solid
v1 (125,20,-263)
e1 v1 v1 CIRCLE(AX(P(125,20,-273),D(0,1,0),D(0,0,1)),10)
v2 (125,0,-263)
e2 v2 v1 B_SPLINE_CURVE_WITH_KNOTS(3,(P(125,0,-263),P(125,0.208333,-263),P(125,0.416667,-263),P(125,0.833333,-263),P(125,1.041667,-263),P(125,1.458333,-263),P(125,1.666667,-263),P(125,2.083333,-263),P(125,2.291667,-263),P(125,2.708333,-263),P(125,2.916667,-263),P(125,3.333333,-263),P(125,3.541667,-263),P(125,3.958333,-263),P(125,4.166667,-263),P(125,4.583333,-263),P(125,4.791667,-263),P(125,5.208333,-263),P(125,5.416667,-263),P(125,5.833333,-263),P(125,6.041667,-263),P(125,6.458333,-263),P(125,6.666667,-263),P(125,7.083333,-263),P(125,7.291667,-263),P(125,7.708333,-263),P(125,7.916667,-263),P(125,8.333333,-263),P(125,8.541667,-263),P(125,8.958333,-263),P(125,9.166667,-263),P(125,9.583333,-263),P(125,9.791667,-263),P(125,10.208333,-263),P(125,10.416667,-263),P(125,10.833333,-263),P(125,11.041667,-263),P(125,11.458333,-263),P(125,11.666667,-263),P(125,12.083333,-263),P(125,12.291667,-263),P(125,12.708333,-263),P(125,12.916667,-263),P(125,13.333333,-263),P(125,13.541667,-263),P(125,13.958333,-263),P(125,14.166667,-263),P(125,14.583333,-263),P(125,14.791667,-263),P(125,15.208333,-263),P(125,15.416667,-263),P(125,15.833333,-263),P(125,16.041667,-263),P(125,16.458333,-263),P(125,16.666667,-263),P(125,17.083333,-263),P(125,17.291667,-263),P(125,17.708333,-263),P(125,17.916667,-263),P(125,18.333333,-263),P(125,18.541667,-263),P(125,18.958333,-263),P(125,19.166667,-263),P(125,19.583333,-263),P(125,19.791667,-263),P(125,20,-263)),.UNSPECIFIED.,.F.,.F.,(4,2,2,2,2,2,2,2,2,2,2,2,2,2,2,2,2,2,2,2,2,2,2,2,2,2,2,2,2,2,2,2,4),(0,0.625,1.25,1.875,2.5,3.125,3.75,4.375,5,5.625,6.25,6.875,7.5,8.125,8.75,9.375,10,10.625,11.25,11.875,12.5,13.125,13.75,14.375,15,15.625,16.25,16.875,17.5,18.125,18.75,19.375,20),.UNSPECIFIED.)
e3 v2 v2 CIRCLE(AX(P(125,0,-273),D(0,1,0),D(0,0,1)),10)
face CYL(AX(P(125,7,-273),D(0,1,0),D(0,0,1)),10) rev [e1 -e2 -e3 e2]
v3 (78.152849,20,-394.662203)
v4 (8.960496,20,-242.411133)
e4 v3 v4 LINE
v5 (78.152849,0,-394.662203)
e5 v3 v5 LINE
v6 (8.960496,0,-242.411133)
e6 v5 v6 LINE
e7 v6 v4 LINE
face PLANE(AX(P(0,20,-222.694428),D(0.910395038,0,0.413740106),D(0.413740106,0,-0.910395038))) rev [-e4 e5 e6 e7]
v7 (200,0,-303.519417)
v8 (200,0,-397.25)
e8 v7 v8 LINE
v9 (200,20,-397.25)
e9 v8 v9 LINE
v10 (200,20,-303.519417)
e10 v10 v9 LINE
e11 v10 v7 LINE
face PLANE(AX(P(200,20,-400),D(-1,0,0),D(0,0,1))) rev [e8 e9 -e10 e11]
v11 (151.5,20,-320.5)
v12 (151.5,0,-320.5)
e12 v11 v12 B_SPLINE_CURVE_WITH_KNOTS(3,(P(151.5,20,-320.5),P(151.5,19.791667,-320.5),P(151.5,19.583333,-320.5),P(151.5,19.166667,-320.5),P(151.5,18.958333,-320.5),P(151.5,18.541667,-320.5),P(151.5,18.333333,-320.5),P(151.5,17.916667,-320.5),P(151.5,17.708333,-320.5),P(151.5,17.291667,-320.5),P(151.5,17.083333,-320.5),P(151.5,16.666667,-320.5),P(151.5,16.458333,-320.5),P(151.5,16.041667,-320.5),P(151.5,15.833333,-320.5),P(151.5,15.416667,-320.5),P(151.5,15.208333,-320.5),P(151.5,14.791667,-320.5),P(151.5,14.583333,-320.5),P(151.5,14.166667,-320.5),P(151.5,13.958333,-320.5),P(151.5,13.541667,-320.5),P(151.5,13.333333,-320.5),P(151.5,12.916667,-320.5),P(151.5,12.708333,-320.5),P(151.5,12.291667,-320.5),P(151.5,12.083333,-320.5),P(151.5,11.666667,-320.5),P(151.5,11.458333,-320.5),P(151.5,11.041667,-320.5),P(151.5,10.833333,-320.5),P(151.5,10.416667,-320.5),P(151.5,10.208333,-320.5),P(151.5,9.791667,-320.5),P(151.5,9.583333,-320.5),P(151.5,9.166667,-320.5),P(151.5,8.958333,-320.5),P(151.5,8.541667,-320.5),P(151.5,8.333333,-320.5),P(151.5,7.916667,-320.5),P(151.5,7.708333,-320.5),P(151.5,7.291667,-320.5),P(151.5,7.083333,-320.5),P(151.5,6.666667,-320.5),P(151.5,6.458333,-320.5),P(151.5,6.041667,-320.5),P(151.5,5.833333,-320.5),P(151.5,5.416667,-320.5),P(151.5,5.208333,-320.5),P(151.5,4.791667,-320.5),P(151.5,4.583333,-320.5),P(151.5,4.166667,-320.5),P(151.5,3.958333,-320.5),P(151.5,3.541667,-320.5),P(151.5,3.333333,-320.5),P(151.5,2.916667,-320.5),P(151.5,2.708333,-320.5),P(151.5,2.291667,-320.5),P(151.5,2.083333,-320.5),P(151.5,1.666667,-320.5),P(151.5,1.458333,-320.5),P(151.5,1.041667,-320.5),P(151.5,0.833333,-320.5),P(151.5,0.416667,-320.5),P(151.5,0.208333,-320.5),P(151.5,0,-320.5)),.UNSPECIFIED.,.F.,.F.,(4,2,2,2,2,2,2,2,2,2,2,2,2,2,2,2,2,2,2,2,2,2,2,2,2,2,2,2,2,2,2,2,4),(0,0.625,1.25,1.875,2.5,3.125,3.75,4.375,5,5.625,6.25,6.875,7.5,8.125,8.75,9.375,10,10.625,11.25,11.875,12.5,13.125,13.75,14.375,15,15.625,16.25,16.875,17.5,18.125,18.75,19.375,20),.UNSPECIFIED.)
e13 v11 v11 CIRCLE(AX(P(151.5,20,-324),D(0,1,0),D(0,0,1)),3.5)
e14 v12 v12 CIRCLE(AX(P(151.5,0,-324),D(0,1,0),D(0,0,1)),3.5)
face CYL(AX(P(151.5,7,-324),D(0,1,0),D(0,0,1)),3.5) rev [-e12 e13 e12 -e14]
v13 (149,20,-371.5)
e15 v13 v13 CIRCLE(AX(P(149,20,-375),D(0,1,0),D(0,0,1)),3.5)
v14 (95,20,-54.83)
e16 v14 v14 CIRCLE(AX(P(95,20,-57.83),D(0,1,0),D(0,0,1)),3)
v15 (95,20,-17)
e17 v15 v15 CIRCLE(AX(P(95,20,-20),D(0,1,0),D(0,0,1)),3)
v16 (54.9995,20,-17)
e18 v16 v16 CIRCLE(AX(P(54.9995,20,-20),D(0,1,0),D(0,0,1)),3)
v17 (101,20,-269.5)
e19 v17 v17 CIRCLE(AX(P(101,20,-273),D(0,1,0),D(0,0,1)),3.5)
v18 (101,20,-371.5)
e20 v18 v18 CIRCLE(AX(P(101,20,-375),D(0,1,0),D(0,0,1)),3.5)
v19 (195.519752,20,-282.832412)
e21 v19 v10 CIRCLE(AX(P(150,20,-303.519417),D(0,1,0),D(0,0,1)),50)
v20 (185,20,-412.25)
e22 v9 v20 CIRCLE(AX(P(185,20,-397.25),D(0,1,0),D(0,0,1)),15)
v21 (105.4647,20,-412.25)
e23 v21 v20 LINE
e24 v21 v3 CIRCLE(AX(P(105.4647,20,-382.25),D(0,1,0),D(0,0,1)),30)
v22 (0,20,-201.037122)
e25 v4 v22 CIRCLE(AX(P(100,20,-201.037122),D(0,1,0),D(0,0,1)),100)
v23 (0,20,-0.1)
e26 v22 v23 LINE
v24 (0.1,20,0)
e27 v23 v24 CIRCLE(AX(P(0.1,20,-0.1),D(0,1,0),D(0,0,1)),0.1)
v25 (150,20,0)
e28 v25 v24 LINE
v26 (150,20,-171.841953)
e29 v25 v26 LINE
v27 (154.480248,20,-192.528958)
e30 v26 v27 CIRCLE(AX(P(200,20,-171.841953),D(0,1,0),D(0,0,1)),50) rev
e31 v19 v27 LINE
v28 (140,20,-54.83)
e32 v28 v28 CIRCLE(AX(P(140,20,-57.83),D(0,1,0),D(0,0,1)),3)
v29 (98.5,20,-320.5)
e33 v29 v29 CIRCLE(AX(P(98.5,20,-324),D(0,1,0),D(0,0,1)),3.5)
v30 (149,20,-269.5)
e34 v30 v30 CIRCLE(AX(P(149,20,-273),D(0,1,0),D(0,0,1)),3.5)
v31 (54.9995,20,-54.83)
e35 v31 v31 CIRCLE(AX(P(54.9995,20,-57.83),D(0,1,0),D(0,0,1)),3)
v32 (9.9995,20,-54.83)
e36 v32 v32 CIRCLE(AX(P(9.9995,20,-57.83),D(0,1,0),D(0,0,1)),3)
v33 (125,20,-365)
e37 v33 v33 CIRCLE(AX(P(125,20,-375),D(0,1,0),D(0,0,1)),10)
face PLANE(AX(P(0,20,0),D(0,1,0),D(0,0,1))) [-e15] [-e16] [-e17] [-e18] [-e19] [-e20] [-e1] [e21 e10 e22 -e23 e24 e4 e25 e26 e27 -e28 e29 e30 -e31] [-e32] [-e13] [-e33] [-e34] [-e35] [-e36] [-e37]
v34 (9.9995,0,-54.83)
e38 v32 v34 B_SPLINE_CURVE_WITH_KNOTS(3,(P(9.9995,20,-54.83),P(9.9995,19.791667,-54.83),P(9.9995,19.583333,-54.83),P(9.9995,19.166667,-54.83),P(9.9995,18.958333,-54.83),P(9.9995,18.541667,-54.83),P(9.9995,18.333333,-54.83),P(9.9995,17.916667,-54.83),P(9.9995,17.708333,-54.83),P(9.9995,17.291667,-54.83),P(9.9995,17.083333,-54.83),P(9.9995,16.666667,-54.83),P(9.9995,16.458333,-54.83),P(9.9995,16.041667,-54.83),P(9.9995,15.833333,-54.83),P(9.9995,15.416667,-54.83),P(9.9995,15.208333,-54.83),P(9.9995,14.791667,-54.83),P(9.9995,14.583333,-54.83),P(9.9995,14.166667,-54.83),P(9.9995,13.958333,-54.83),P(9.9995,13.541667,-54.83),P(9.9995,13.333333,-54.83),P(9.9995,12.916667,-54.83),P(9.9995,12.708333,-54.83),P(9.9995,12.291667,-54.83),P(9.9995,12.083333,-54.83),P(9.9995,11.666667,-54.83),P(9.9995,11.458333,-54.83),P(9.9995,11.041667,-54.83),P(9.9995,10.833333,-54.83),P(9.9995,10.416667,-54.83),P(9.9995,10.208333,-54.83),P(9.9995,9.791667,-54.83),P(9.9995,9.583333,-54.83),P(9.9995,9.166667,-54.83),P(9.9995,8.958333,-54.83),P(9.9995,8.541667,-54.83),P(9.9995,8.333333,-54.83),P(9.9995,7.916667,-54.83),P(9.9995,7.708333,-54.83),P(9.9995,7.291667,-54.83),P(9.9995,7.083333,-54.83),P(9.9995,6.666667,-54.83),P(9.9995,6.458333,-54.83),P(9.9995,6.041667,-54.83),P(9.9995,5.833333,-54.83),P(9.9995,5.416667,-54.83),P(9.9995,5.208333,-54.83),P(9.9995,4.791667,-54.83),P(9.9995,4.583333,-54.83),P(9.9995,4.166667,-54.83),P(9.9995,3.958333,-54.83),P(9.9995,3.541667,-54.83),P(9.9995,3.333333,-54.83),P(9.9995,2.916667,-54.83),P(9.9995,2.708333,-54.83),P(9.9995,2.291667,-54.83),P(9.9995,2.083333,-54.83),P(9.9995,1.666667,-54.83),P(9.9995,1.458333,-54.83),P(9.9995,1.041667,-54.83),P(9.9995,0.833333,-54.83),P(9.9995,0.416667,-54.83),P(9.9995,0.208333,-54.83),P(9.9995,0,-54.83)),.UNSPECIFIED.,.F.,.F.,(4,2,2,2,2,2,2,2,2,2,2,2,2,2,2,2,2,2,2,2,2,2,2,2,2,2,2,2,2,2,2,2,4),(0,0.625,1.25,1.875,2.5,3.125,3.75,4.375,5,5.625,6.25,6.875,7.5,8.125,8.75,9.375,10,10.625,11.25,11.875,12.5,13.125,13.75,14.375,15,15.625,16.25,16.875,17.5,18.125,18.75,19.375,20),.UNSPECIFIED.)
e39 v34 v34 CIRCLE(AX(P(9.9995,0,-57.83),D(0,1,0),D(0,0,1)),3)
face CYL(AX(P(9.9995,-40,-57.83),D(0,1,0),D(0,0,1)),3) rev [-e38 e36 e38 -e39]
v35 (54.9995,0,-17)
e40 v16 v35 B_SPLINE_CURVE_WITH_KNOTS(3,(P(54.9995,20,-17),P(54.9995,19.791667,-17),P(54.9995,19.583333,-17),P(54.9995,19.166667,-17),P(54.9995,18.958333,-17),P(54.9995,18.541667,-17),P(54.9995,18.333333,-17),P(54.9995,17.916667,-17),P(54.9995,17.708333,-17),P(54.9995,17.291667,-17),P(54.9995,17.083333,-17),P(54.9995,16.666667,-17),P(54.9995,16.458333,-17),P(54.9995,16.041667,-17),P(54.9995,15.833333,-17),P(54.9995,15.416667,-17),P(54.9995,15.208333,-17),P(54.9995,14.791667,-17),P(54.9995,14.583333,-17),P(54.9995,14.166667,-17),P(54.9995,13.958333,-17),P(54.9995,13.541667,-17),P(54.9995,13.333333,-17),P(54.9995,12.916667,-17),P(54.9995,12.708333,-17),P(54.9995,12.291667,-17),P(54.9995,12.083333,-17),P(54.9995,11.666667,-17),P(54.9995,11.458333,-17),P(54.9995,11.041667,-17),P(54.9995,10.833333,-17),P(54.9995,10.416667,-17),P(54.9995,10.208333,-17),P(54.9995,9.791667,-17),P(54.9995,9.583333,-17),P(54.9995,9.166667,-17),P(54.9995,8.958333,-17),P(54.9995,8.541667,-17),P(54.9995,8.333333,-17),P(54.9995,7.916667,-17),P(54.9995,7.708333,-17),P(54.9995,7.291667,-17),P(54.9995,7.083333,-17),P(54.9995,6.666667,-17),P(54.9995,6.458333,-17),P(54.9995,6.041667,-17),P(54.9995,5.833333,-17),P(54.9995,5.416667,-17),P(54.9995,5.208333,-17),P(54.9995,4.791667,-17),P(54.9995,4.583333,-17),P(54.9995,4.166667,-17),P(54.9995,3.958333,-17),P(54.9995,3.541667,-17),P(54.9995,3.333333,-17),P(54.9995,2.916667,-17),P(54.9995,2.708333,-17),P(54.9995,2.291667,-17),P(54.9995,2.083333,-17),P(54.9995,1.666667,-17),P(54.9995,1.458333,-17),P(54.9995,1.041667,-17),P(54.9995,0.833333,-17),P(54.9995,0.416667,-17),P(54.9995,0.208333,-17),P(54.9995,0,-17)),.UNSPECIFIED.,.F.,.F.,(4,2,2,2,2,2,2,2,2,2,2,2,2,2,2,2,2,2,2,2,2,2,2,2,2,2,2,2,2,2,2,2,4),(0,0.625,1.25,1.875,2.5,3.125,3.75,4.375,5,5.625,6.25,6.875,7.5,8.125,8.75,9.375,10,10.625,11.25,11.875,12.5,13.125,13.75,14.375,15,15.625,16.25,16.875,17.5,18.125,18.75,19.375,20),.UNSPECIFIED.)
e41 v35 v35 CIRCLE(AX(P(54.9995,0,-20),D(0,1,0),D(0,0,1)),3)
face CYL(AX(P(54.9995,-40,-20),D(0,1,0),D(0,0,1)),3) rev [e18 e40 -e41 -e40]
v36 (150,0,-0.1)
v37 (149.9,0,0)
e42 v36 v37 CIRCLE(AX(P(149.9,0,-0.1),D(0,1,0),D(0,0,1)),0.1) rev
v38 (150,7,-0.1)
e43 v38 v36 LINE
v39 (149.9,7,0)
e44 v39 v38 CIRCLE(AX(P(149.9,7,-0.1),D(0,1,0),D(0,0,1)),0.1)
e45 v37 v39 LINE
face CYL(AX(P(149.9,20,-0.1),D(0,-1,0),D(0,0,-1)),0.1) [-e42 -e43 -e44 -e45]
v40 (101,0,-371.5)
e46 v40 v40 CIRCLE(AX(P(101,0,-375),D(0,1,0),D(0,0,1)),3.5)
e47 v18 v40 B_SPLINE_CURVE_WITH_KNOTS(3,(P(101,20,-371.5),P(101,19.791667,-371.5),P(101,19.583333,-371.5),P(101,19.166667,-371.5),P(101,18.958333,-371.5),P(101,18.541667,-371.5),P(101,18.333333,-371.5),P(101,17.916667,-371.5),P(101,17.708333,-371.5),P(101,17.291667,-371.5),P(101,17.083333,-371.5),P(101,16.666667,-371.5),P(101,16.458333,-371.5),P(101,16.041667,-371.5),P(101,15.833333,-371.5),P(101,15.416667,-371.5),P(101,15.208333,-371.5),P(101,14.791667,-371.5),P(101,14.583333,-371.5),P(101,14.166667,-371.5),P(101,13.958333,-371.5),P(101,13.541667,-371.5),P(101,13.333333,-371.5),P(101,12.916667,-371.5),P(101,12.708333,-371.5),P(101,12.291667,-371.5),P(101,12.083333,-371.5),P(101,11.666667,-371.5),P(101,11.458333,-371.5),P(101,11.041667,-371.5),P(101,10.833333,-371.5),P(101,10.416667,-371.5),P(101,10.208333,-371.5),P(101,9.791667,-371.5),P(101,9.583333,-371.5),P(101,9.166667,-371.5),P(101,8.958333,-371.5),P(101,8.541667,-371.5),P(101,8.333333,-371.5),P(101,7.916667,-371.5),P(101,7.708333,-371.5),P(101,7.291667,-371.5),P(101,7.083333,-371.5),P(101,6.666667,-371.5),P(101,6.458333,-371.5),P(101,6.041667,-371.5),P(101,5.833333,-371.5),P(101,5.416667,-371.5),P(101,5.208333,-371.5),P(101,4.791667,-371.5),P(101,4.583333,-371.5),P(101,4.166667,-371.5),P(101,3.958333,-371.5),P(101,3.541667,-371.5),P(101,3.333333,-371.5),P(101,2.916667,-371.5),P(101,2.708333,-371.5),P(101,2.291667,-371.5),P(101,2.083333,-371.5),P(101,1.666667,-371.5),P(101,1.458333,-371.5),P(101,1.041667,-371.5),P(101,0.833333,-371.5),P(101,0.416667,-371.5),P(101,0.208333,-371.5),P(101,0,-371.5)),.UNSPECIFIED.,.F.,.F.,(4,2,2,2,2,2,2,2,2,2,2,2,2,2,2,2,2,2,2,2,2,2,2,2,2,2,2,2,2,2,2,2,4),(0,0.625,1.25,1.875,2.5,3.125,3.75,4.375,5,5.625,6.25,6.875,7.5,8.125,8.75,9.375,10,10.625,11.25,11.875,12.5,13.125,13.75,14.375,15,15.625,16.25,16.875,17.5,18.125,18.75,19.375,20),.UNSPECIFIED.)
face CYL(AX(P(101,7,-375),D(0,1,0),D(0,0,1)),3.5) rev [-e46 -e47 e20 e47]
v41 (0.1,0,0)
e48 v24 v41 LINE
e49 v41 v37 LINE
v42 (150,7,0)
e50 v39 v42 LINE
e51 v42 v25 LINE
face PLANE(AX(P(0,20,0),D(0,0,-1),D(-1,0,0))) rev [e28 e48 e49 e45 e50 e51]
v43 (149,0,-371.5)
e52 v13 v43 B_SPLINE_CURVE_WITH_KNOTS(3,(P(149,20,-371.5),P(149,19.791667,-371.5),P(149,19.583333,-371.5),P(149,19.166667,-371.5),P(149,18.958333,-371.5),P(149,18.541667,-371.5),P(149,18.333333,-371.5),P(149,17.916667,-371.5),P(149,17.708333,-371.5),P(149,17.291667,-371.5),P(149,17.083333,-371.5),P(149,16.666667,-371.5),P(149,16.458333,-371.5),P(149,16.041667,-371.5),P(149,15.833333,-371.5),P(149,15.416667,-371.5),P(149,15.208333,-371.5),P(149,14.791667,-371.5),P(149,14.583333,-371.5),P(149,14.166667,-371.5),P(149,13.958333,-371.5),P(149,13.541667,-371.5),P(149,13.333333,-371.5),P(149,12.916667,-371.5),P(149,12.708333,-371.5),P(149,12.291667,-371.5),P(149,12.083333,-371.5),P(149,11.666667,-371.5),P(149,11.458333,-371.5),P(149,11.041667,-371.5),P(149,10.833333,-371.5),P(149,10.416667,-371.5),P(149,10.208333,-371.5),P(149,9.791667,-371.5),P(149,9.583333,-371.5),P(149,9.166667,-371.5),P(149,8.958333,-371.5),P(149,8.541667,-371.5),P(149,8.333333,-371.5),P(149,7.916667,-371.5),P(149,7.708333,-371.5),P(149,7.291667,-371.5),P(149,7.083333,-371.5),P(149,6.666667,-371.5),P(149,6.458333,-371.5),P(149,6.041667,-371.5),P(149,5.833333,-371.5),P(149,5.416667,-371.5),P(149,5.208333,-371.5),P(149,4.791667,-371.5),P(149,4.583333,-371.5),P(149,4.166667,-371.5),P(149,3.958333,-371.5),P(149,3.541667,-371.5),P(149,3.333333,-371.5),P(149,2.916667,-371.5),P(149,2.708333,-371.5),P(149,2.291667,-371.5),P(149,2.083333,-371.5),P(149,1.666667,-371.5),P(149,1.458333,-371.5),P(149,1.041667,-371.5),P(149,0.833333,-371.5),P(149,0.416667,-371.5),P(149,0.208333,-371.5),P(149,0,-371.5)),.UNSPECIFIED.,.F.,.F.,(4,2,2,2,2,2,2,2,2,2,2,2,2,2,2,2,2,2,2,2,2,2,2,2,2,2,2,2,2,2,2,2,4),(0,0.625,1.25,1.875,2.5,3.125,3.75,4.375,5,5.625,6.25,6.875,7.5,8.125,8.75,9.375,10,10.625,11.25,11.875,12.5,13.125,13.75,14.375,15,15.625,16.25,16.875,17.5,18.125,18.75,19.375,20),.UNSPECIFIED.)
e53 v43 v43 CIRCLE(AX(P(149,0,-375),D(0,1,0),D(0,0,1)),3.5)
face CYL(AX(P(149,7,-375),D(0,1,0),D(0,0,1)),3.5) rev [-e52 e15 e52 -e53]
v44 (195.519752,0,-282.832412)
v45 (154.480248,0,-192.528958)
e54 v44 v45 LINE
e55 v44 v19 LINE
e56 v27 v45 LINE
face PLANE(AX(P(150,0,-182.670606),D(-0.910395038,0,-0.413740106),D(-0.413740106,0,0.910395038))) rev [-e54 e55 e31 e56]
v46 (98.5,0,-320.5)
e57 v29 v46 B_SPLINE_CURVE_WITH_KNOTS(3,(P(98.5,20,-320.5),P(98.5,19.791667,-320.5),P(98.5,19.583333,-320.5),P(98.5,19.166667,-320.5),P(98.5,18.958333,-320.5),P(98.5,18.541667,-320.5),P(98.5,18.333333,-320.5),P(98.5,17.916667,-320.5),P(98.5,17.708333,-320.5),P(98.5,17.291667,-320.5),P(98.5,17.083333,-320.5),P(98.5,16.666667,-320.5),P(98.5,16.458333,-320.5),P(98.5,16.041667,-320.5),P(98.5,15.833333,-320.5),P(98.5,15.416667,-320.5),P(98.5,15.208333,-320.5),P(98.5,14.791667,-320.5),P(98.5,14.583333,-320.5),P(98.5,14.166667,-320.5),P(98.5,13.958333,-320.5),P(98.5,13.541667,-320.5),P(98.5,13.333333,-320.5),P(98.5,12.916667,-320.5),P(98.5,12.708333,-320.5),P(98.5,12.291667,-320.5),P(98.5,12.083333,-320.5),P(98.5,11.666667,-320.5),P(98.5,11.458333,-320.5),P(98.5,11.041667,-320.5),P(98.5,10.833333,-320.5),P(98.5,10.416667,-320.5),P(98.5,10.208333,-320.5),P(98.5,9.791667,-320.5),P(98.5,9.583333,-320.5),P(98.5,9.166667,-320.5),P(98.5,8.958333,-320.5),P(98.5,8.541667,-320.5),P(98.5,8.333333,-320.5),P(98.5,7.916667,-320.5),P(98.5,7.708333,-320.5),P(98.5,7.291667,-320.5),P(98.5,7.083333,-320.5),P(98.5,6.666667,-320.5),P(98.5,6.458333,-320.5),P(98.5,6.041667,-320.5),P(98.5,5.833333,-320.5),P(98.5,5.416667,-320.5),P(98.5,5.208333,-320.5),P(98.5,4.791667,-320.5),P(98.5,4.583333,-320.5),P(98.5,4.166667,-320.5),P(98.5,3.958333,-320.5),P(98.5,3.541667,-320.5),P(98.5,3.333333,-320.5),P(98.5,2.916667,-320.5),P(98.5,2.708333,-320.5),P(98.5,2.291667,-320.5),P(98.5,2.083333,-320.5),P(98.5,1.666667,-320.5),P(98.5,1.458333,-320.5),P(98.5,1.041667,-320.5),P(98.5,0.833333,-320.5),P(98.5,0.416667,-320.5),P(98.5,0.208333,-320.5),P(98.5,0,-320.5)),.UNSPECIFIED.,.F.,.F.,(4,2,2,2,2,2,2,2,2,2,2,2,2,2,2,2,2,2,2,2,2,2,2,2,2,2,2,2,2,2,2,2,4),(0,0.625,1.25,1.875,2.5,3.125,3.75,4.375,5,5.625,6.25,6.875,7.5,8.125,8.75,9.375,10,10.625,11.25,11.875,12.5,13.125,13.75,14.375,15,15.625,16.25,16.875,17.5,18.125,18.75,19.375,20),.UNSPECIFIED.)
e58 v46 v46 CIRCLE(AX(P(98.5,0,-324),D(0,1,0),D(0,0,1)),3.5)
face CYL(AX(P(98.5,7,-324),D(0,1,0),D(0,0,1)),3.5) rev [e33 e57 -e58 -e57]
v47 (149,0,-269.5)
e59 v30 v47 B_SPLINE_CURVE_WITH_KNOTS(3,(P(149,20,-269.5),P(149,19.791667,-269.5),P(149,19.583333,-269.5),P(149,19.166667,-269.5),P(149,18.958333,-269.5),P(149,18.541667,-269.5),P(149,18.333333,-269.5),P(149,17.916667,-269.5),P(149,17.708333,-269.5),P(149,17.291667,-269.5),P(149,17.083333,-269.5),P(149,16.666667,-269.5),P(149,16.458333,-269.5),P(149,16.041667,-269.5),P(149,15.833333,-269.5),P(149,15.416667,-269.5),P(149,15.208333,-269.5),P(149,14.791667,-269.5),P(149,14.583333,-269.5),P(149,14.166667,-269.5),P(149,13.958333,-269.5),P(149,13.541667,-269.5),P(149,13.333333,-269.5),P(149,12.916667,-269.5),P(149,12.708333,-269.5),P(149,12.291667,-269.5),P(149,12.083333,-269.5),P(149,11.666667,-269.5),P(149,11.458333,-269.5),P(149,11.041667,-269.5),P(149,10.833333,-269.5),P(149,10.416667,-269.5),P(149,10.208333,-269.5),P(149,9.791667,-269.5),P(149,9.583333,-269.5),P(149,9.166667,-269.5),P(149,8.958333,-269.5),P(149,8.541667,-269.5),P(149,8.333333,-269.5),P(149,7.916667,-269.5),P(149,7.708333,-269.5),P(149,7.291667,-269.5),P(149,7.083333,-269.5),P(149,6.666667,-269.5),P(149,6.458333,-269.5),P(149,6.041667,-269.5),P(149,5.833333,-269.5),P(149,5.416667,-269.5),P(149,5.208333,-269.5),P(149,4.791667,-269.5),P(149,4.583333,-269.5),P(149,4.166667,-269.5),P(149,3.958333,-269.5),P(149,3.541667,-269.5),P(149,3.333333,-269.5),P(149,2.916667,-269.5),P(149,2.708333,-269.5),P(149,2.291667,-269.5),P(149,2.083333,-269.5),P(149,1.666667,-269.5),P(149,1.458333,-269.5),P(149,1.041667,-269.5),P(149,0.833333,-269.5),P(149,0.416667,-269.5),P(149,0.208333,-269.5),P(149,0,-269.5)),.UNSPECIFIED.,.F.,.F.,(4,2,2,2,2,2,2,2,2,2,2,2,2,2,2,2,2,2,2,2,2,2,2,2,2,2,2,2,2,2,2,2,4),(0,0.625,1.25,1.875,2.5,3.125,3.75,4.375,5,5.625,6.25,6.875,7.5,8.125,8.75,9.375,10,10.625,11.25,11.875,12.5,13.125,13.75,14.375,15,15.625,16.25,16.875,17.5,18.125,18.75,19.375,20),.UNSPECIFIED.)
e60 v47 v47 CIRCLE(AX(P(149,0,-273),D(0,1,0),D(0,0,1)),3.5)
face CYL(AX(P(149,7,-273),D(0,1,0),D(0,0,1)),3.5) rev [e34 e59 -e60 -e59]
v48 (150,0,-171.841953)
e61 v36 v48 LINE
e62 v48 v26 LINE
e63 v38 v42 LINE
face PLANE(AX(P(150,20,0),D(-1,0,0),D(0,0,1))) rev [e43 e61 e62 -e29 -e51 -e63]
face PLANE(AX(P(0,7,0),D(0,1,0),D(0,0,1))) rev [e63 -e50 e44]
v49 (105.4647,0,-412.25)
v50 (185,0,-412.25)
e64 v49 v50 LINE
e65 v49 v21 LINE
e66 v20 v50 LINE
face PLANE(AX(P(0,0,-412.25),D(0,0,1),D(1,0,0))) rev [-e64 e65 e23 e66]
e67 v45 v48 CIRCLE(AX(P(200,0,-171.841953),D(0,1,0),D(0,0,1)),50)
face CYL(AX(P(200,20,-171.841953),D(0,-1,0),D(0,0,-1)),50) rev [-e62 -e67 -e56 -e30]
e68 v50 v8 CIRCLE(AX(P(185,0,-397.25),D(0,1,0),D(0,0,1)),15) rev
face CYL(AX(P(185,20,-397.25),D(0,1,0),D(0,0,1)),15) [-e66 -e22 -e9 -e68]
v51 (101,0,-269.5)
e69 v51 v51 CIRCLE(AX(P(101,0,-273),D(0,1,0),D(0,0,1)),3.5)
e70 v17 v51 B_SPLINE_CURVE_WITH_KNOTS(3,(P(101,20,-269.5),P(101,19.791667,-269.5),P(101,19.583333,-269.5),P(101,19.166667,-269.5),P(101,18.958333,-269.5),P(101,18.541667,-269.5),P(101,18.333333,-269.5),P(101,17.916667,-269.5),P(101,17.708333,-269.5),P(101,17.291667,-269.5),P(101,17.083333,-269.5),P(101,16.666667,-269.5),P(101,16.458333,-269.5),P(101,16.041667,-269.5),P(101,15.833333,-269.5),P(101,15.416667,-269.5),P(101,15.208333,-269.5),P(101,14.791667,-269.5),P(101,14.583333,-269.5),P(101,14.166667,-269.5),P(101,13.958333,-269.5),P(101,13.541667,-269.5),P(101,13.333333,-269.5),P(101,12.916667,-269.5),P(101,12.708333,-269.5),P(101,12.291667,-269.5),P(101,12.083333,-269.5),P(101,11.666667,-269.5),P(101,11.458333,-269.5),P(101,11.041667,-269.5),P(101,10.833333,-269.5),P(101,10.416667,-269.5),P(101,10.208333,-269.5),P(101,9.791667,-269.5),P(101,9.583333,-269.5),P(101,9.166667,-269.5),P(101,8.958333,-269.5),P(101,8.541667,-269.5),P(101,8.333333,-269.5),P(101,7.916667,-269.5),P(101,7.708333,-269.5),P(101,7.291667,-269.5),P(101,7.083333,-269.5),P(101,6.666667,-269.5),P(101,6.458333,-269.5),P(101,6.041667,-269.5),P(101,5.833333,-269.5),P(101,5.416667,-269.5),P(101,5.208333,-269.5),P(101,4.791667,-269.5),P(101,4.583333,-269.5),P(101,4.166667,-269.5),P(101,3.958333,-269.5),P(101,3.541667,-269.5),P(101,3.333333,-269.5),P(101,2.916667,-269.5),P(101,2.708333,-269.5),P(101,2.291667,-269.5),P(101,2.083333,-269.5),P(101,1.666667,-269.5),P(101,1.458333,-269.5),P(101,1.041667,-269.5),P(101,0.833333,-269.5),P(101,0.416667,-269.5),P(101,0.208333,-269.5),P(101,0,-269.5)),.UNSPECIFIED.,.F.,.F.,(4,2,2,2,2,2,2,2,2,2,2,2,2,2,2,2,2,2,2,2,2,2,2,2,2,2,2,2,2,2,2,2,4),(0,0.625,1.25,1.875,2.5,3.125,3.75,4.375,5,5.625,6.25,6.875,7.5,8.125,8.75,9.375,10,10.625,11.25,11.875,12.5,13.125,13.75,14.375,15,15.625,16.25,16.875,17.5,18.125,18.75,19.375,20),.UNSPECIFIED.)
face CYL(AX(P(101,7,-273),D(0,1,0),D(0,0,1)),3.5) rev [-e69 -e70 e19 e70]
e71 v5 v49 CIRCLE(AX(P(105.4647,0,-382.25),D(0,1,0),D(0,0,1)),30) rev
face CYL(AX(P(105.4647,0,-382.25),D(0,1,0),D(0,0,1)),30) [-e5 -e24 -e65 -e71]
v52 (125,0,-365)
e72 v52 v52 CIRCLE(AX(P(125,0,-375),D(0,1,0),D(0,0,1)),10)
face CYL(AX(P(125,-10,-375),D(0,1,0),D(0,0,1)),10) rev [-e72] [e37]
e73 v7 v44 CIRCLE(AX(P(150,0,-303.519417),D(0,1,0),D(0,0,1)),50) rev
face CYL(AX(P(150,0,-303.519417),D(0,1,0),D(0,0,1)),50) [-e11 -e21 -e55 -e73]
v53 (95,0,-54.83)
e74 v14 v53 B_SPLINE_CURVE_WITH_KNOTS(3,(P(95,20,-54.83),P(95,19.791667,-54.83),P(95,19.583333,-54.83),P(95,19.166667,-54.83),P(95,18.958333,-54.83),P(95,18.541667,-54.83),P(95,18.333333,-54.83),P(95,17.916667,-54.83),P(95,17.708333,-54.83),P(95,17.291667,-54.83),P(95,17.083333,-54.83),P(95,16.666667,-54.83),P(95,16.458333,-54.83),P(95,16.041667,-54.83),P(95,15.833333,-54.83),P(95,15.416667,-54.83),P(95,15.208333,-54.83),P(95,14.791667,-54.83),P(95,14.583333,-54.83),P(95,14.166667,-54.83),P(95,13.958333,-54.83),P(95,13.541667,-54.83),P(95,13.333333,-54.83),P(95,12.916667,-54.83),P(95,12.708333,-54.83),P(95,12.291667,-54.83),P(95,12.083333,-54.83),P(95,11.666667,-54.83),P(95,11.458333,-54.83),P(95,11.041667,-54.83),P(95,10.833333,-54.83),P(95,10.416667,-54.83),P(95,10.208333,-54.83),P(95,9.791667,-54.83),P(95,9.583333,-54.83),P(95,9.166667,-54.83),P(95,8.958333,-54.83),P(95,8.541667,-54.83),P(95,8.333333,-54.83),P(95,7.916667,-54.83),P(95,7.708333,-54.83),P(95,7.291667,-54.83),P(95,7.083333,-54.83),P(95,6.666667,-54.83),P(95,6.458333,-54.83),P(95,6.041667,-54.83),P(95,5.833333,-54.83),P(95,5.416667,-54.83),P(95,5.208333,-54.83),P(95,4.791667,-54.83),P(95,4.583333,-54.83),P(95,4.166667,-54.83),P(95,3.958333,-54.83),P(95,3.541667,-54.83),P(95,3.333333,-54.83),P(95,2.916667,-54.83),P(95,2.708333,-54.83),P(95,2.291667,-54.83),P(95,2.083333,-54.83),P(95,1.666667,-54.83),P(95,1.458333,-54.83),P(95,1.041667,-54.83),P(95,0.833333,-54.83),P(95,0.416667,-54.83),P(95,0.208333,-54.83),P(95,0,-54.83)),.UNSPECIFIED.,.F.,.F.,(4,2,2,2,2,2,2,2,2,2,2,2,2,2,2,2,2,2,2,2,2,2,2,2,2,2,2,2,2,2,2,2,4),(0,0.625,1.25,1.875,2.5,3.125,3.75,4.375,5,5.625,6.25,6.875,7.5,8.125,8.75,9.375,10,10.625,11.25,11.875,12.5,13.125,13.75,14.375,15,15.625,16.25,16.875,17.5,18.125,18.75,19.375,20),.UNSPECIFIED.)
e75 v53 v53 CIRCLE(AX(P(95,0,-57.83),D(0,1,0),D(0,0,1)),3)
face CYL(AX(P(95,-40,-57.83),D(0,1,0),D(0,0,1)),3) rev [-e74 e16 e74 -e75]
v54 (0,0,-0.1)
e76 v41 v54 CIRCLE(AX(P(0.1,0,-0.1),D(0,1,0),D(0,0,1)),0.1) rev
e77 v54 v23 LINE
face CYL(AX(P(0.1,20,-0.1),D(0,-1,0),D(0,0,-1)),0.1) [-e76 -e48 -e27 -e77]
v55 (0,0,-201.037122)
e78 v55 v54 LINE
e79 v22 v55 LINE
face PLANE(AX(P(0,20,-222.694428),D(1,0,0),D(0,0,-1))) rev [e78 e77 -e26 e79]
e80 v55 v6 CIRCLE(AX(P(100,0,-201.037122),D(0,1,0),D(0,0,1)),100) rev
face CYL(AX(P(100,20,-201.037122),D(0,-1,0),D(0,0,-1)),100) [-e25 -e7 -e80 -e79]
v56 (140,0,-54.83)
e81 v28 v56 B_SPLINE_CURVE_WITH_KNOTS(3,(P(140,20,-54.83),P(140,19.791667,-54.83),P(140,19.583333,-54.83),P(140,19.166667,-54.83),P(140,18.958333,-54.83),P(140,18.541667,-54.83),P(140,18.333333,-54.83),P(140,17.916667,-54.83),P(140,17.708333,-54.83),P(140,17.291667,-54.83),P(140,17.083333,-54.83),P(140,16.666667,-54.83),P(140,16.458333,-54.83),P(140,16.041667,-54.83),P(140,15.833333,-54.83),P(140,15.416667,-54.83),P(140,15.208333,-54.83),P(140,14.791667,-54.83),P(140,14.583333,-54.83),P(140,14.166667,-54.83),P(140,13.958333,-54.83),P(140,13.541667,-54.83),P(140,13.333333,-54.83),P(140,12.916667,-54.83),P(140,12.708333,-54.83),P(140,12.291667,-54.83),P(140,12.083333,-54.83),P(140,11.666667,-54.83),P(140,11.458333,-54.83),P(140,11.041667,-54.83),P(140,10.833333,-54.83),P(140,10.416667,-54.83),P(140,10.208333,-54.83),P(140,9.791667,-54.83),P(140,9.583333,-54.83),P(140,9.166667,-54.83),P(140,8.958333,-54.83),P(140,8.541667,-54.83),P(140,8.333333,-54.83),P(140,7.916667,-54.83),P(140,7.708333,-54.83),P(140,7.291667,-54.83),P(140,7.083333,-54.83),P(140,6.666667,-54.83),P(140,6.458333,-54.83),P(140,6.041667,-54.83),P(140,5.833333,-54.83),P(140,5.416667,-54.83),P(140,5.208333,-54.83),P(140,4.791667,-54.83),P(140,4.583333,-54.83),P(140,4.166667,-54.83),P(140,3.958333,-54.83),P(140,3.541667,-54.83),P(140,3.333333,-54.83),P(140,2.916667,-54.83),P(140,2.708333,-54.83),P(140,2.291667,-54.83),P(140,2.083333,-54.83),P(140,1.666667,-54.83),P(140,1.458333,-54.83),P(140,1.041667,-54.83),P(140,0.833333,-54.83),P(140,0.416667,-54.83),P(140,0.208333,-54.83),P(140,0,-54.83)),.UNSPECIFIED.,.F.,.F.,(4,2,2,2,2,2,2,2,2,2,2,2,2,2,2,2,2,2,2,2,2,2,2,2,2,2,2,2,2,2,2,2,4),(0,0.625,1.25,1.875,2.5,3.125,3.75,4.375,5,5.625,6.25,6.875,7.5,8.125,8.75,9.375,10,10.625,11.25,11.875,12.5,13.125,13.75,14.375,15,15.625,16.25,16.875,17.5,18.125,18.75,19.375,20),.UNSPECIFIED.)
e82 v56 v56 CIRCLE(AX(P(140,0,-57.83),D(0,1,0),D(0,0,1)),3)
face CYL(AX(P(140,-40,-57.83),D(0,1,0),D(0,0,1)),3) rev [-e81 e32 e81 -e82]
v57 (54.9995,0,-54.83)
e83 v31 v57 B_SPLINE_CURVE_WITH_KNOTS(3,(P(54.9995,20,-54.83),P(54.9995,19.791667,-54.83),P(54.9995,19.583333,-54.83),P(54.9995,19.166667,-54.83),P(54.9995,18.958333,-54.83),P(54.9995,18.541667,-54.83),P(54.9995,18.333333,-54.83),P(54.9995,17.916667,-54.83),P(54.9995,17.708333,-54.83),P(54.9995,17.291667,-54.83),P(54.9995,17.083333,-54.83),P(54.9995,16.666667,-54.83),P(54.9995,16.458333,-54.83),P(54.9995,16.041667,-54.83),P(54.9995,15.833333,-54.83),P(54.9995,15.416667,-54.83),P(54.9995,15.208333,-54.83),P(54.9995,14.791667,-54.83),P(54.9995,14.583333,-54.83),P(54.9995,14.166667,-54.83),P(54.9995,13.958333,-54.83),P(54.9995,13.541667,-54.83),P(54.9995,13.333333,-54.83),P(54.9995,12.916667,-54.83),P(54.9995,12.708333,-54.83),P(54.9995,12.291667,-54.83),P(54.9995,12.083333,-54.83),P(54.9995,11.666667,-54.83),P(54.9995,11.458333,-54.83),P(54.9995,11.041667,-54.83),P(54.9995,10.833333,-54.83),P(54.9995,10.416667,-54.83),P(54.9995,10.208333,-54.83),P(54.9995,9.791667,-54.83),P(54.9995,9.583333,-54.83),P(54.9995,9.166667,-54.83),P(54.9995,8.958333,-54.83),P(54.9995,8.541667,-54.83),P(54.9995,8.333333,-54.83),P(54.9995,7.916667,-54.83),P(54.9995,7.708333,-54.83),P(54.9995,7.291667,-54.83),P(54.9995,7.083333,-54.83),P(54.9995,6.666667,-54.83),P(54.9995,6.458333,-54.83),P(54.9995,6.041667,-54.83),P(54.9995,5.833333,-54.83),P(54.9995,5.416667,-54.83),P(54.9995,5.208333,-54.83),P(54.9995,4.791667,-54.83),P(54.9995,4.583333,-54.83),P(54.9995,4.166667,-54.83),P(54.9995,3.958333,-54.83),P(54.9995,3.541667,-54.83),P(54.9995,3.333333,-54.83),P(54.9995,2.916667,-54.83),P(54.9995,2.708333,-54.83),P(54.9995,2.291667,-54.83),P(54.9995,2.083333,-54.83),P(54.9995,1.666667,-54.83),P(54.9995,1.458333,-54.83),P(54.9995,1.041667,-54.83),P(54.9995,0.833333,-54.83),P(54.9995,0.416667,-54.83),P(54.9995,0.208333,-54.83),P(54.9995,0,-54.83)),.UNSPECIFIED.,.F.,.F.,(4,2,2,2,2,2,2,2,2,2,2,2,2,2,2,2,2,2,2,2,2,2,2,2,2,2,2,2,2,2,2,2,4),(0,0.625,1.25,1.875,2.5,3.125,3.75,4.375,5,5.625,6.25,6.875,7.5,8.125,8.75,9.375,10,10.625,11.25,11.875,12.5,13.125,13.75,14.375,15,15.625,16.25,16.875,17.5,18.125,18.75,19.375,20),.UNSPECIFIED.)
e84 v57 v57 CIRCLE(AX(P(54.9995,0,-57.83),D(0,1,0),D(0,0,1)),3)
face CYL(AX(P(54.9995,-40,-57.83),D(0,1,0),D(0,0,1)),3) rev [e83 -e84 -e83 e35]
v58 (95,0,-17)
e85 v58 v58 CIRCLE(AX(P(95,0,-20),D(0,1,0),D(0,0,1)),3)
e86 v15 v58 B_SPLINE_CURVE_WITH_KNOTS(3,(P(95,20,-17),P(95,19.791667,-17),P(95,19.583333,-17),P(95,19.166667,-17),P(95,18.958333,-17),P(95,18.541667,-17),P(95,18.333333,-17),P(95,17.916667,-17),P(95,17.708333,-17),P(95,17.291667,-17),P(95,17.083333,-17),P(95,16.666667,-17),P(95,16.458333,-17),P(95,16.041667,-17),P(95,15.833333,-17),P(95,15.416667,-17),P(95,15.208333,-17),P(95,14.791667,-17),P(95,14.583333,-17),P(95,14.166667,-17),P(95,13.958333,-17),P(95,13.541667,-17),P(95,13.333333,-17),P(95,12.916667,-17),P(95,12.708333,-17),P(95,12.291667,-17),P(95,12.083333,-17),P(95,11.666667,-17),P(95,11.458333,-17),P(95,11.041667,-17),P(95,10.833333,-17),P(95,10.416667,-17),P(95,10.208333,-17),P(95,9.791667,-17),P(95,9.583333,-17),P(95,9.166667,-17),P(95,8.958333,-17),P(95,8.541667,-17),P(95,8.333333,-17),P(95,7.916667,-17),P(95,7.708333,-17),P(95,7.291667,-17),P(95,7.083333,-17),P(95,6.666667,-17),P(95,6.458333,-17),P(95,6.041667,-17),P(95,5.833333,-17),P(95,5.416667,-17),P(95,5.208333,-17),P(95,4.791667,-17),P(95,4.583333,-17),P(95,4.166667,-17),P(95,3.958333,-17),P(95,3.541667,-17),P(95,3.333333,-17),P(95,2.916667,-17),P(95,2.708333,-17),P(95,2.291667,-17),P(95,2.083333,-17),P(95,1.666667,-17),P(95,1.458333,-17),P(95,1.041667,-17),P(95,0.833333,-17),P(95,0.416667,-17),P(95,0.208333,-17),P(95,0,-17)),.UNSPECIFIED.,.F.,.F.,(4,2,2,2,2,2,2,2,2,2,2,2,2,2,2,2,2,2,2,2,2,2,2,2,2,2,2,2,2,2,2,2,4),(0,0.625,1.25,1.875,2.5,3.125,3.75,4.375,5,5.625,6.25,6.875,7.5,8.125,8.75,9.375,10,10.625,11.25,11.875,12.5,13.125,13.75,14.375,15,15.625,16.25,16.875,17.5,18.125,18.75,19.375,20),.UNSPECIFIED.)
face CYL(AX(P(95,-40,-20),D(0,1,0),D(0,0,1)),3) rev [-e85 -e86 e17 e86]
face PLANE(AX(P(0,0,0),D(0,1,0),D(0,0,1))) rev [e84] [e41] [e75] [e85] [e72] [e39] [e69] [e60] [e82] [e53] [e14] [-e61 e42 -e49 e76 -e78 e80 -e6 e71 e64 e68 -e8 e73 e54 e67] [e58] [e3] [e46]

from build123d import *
from build123d.topology import SkipClean

# Parameters (mm, degrees)
BOSS_EXTRUDE1_DEPTH  = 20
FILLET1_R            = 15
FILLET3_R            = 30
FILLET4_R            = 100
CUT_EXTRUDE1_DEPTH   = 20
FILLET6_R            = 50
FILLET7_R            = 50
FILLET9_R            = 0.1
FILLET10_R           = 0.1
SKETCH3_R            = 3
CUT_EXTRUDE2_DEPTH   = 13
SKETCH4_R            = 8
SKETCH4_R_2          = 10
CUT_EXTRUDE3_DEPTH   = 30
SKETCH5_R            = 3.5
CUT_EXTRUDE4_DEPTH   = 13
SKETCH6_R            = 3.5
CUT_EXTRUDE5_DEPTH   = 13
SKETCH7_R            = 3
BOSS_EXTRUDE2_DEPTH  = 13
SKETCH8_R            = 3
BOSS_EXTRUDE3_DEPTH  = 13
SKETCH9_R            = 8
SKETCH9_R_2          = 3.5
SKETCH9_R_3          = 10
CUT_EXTRUDE6_DEPTH   = 13
SKETCH10_R           = 3.5
BOSS_EXTRUDE4_DEPTH  = 13
SKETCH12_W           = 149.9
SKETCH12_H           = 13
CUT_EXTRUDE9_DEPTH   = 70
SKETCH13_R           = 3
CUT_EXTRUDE12_DEPTH  = 60
SKETCH16_R           = 8
SKETCH16_R_2         = 3.5
SKETCH16_R_3         = 10
CUT_EXTRUDE14_DEPTH  = 60
BOSS_EXTRUDE5_START  = -7
BOSS_EXTRUDE5_DEPTH  = 7
SKETCH18_W           = 85.102461965
SKETCH18_H           = 20
BOSS_EXTRUDE6_DEPTH  = 2.25
BOSS_EXTRUDE7_DEPTH  = 20
FILLET11_R           = 30
FILLET12_R           = 15
BOSS_EXTRUDE9_START  = -20
BOSS_EXTRUDE9_DEPTH  = 20
FILLET13_R           = 30
FILLET14_R           = 15
SKETCH21_R           = 8
BOSS_EXTRUDE10_DEPTH = 20


with BuildPart() as part:
    # Sketch1 → Boss-Extrude1 (new body)
    with BuildSketch(Plane(origin=(0, 0, 0), x_dir=(1, 0, 0), z_dir=(0, 1, 0))):
        Polygon((0, 0), (150, 0), (150, 150), (200, 260), (200, 400), (80.578675248, 400), (0, 222.694428273), align=None)
    extrude(amount=BOSS_EXTRUDE1_DEPTH)

    # Fillet1
    fillet1_edges = [part.edges().sort_by_distance(p)[0] for p in [
        (200, 10, -400),
    ]]
    fillet(fillet1_edges, radius=FILLET1_R)

    # Fillet3
    fillet3_edges = [part.edges().sort_by_distance(p)[0] for p in [
        (80.578675248, 10, -400),
    ]]
    fillet(fillet3_edges, radius=FILLET3_R)

    # Fillet4
    fillet4_edges = [part.edges().sort_by_distance(p)[0] for p in [
        (0, 10, -222.694428273),
    ]]
    fillet(fillet4_edges, radius=FILLET4_R)

    # Sketch2 → Cut-Extrude1 (cut)
    with BuildSketch(Plane(origin=(0, 20, 0), x_dir=(1, 0, 0), z_dir=(0, 1, 0))):
        Polygon((150, 150), (150, 173.876585238), (150, 182.670606049), (200, 292.6907641), (200, 260), align=None)
    extrude(amount=-CUT_EXTRUDE1_DEPTH, mode=Mode.SUBTRACT)

    # Fillet6
    fillet6_edges = [part.edges().sort_by_distance(p)[0] for p in [
        (200, 10, -292.6907641),
    ]]
    fillet(fillet6_edges, radius=FILLET6_R)

    # Fillet7
    fillet7_edges = [part.edges().sort_by_distance(p)[0] for p in [
        (150, 10, -182.670606049),
    ]]
    fillet(fillet7_edges, radius=FILLET7_R)

    # Fillet9
    fillet9_edges = [part.edges().sort_by_distance(p)[0] for p in [
        (0, 10, 0),
    ]]
    fillet(fillet9_edges, radius=FILLET9_R)

    # Fillet10
    fillet10_edges = [part.edges().sort_by_distance(p)[0] for p in [
        (150, 10, 0),
    ]]
    fillet(fillet10_edges, radius=FILLET10_R)

    # Sketch3 → Cut-Extrude2 (cut)
    with BuildSketch(Plane(origin=(0, 20, 0), x_dir=(1, 0, 0), z_dir=(0, 1, 0))):
        with Locations(Location((10, 57.83, 0), (0, 0, 270))):
            Circle(SKETCH3_R)
        with Locations(Location((55, 57.83, 0), (0, 0, 270))):
            Circle(SKETCH3_R)
        with Locations(Location((55, 20, 0), (0, 0, 270))):
            Circle(SKETCH3_R)
        with Locations(Location((95, 57.83, 0), (0, 0, 270))):
            Circle(SKETCH3_R)
        with Locations(Location((140, 57.83, 0), (0, 0, 270))):
            Circle(SKETCH3_R)
        with Locations(Location((95, 20, 0), (0, 0, 270))):
            Circle(SKETCH3_R)
    extrude(amount=-CUT_EXTRUDE2_DEPTH, mode=Mode.SUBTRACT)

    # Sketch4 → Cut-Extrude3 (cut)
    with BuildSketch(Plane(origin=(0, 20, 0), x_dir=(1, 0, 0), z_dir=(0, 1, 0))):
        with Locations(Location((125, 330, 0), (0, 0, 270))):
            Circle(SKETCH4_R)
        with Locations(Location((125, 375, 0), (0, 0, 270))):
            Circle(SKETCH4_R_2)
        with Locations(Location((125, 285, 0), (0, 0, 270))):
            Circle(SKETCH4_R_2)
    extrude(amount=-CUT_EXTRUDE3_DEPTH, mode=Mode.SUBTRACT)

    # Sketch5 → Cut-Extrude4 (cut)
    with BuildSketch(Plane(origin=(0, 20, 0), x_dir=(1, 0, 0), z_dir=(0, 1, 0))):
        with Locations(Location((149, 375, 0), (0, 0, 270))):
            Circle(SKETCH5_R)
        with Locations(Location((101, 375, 0), (0, 0, 270))):
            Circle(SKETCH5_R)
        with Locations(Location((149, 285, 0), (0, 0, 270))):
            Circle(SKETCH5_R)
        with Locations(Location((101, 285, 0), (0, 0, 270))):
            Circle(SKETCH5_R)
    extrude(amount=-CUT_EXTRUDE4_DEPTH, mode=Mode.SUBTRACT)

    # Sketch6 → Cut-Extrude5 (cut)
    with BuildSketch(Plane(origin=(0, 20, 0), x_dir=(1, 0, 0), z_dir=(0, 1, 0))):
        with Locations(Location((151.5, 330, 0), (0, 0, 270))):
            Circle(SKETCH6_R)
        with Locations(Location((98.5, 330, 0), (0, 0, 270))):
            Circle(SKETCH6_R)
    extrude(amount=-CUT_EXTRUDE5_DEPTH, mode=Mode.SUBTRACT)

    # Sketch7 → Boss-Extrude2 (add)
    with BuildSketch(Plane(origin=(0, 20, 0), x_dir=(1, 0, 0), z_dir=(0, 1, 0))):
        with BuildLine():
            Line((149.9, 0), (0.1, 0))
            Line((0.1, 0), (0.1, -70))
            Line((0.1, -70), (39.581431097, -70))
            Line((39.581431097, -70), (55.1, -70))
            Line((55.1, -70), (150, -70))
            Line((150, -70), (150, 0.1))
            ThreePointArc((150, 0.1), (149.970710678, 0.029289322), (149.9, 0))
        make_face()
        with Locations(Location((10.1, -12.17, 0), (0, 0, 270))):
            Circle(SKETCH7_R, mode=Mode.SUBTRACT)
        with BuildLine():
            ThreePointArc((58.1, -50), (57.221320344, -52.121320344), (55.1, -53))
            ThreePointArc((55.1, -53), (52.1, -50), (55.1, -47))
            ThreePointArc((55.1, -47), (57.221320344, -47.878679656), (58.1, -50))
        make_face(mode=Mode.SUBTRACT)
        with BuildLine():
            ThreePointArc((58.1, -12.17), (57.221320344, -14.291320344), (55.1, -15.17))
            ThreePointArc((55.1, -15.17), (52.978679656, -14.291320344), (52.1, -12.17))
            ThreePointArc((52.1, -12.17), (55.1, -9.17), (58.1, -12.17))
        make_face(mode=Mode.SUBTRACT)
        with BuildLine():
            ThreePointArc((98.1, -50), (92.978679656, -52.121320344), (95.1, -47))
            ThreePointArc((95.1, -47), (97.221320344, -47.878679656), (98.1, -50))
        make_face(mode=Mode.SUBTRACT)
        with BuildLine():
            ThreePointArc((95.1, -15.17), (92.978679656, -14.291320344), (92.1, -12.17))
            ThreePointArc((92.1, -12.17), (95.1, -9.17), (98.1, -12.17))
            ThreePointArc((98.1, -12.17), (97.221320344, -14.291320344), (95.1, -15.17))
        make_face(mode=Mode.SUBTRACT)
        with BuildLine():
            ThreePointArc((143.1, -12.17), (140.1, -15.17), (137.1, -12.17))
            ThreePointArc((137.1, -12.17), (140.1, -9.17), (143.1, -12.17))
        make_face(mode=Mode.SUBTRACT)
    extrude(amount=-BOSS_EXTRUDE2_DEPTH)

    # Sketch8 → Boss-Extrude3 (add)
    with BuildSketch(Plane(origin=(0, 20, 0), x_dir=(1, 0, 0), z_dir=(0, 1, 0))):
        with Locations((10, 57.83)):
            Circle(SKETCH8_R)
        with Locations((55, 57.83)):
            Circle(SKETCH8_R)
        with Locations((95, 57.83)):
            Circle(SKETCH8_R)
        with Locations((140, 57.83)):
            Circle(SKETCH8_R)
        with Locations((95, 20)):
            Circle(SKETCH8_R)
        with Locations((55, 20)):
            Circle(SKETCH8_R)
    extrude(amount=-BOSS_EXTRUDE3_DEPTH)

    # Sketch9 → Cut-Extrude6 (cut)
    with BuildSketch(Plane(origin=(0, 20, 0), x_dir=(1, 0, 0), z_dir=(0, 1, 0))):
        with Locations((125, 324)):
            Circle(SKETCH9_R)
        with Locations((98.5, 324)):
            Circle(SKETCH9_R_2)
        with Locations((151.5, 324)):
            Circle(SKETCH9_R_2)
        with Locations(Location((101, 273, 0), (0, 0, 270))):
            Circle(SKETCH9_R_2)
        with Locations((125, 273)):
            Circle(SKETCH9_R_3)
        with Locations(Location((149, 273, 0), (0, 0, 270))):
            Circle(SKETCH9_R_2)
    extrude(amount=-CUT_EXTRUDE6_DEPTH, mode=Mode.SUBTRACT)

    # Sketch10 → Boss-Extrude4 (add)
    with BuildSketch(Plane(origin=(0, 20, 0), x_dir=(1, 0, 0), z_dir=(0, 1, 0))):
        with BuildLine():
            ThreePointArc((117.583801513, 327), (125, 332), (132.416198487, 327))
            ThreePointArc((132.416198487, 327), (132.85269342, 328.4718619), (133, 330))
            ThreePointArc((133, 330), (123.4718619, 337.85269342), (117.583801513, 327))
        make_face()
        with BuildLine():
            ThreePointArc((149.697224362, 327), (151.5, 327.5), (153.302775638, 327))
            ThreePointArc((153.302775638, 327), (154.546285831, 328.276589824), (155, 330))
            ThreePointArc((155, 330), (149.776589824, 333.046285831), (149.697224362, 327))
        make_face()
        with BuildLine():
            ThreePointArc((100.302775638, 327), (101.546285831, 328.276589824), (102, 330))
            ThreePointArc((102, 330), (96.776589824, 333.046285831), (96.697224362, 327))
            ThreePointArc((96.697224362, 327), (98.5, 327.5), (100.302775638, 327))
        make_face()
        with Locations((101, 285)):
            Circle(SKETCH10_R)
        with BuildLine():
            ThreePointArc((133, 279), (134.486832981, 281.83772234), (135, 285))
            ThreePointArc((135, 285), (121.83772234, 294.486832981), (117, 279))
            ThreePointArc((117, 279), (125, 283), (133, 279))
        make_face()
        with Locations((149, 285)):
            Circle(SKETCH10_R)
    extrude(amount=-BOSS_EXTRUDE4_DEPTH)

    # Sketch12 → Cut-Extrude9 (cut)
    with BuildSketch(Plane.XY.offset(70)):
        with Locations((75.05, 13.5)):
            Rectangle(SKETCH12_W, SKETCH12_H)
    extrude(amount=-CUT_EXTRUDE9_DEPTH, mode=Mode.SUBTRACT)

    # Sketch13 → Cut-Extrude12 (cut)
    with BuildSketch(Plane(origin=(0, 20, 0), x_dir=(1, 0, 0), z_dir=(0, 1, 0))):
        with Locations(Location((9.999499987, 57.83, 0), (0, 0, 270))):
            Circle(SKETCH13_R)
        with Locations(Location((54.999499987, 57.83, 0), (0, 0, 270))):
            Circle(SKETCH13_R)
        with Locations(Location((95, 57.83, 0), (0, 0, 270))):
            Circle(SKETCH13_R)
        with Locations(Location((140, 57.83, 0), (0, 0, 270))):
            Circle(SKETCH13_R)
        with Locations(Location((95, 20, 0), (0, 0, 270))):
            Circle(SKETCH13_R)
        with Locations(Location((54.999499987, 20, 0), (0, 0, 270))):
            Circle(SKETCH13_R)
    extrude(amount=-CUT_EXTRUDE12_DEPTH, mode=Mode.SUBTRACT)

    # Sketch16 → Cut-Extrude14 (cut)
    with BuildSketch(Plane(origin=(0, 20, 0), x_dir=(1, 0, 0), z_dir=(0, 1, 0))):
        with Locations(Location((125, 324, 0), (0, 0, 270))):
            Circle(SKETCH16_R)
        with Locations(Location((151.5, 324, 0), (0, 0, 270))):
            Circle(SKETCH16_R_2)
        with Locations(Location((101, 273, 0), (0, 0, 270))):
            Circle(SKETCH16_R_2)
        with Locations(Location((125, 273, 0), (0, 0, 270))):
            Circle(SKETCH16_R_3)
        with Locations(Location((149, 273, 0), (0, 0, 270))):
            Circle(SKETCH16_R_2)
        with Locations(Location((98.5, 324, 0), (0, 0, 270))):
            Circle(SKETCH16_R_2)
        with Locations(Location((101, 375, 0), (0, 0, 270))):
            Circle(SKETCH16_R_2)
        with Locations(Location((149, 375, 0), (0, 0, 270))):
            Circle(SKETCH16_R_2)
    extrude(amount=-CUT_EXTRUDE14_DEPTH, mode=Mode.SUBTRACT)

    # Sketch17 → Boss-Extrude5 (add)
    with SkipClean():  # the faces are left unmerged after this step: merging them gives an invalid solid
        with BuildSketch(Plane.XZ.offset(BOSS_EXTRUDE5_START)):
            with BuildLine():
                ThreePointArc((133, -279), (125, -283), (117, -279))
                ThreePointArc((117, -279), (121.83772234, -294.486832981), (135, -285))
                ThreePointArc((135, -285), (134.486832981, -281.83772234), (133, -279))
            make_face()
            with BuildLine():
                ThreePointArc((132.416198487, -327), (125, -332), (117.583801513, -327))
                ThreePointArc((117.583801513, -327), (123.4718619, -337.85269342), (133, -330))
                ThreePointArc((133, -330), (132.85269342, -328.4718619), (132.416198487, -327))
            make_face()
        extrude(amount=BOSS_EXTRUDE5_DEPTH)
    add(part.part.scale(1), mode=Mode.REPLACE)  # the faces are merged on a copy

    # Sketch18 → Boss-Extrude6 (add)
    with BuildSketch(Plane(origin=(0, 0, -400), x_dir=(-1, 0, 0), z_dir=(0, 0, -1))):
        with Locations((-142.448769018, 10)):
            Rectangle(SKETCH18_W, SKETCH18_H)
    extrude(amount=BOSS_EXTRUDE6_DEPTH)

    # Sketch19 → Boss-Extrude7 (add)
    with BuildSketch(Plane(origin=(0, 20, 0), x_dir=(1, 0, 0), z_dir=(0, 1, 0))):
        with BuildLine():
            Line((83.357981151, 402.25), (74.614259042, 386.147934958))
            ThreePointArc((74.614259042, 386.147934958), (85.482928236, 396.310055575), (99.897538035, 400))
            Line((99.897538035, 400), (99.897538035, 402.25))
            Line((99.897538035, 402.25), (83.357981151, 402.25))
        make_face()
        with BuildLine():
            Line((200, 385), (200, 402.25))
            Line((200, 402.25), (185, 402.25))
            Line((185, 402.25), (185, 400))
            ThreePointArc((185, 400), (195.606601718, 395.606601718), (200, 385))
        make_face()
    extrude(amount=-BOSS_EXTRUDE7_DEPTH)

    # Fillet11
    fillet11_edges = [part.edges().sort_by_distance(p)[0] for p in [
        (83.357981151, 10, -402.25),
    ]]
    fillet(fillet11_edges, radius=FILLET11_R)

    # Fillet12
    fillet12_edges = [part.edges().sort_by_distance(p)[0] for p in [
        (200, 10, -402.25),
    ]]
    fillet(fillet12_edges, radius=FILLET12_R)

    # Sketch20 → Boss-Extrude9 (add)
    with BuildSketch(Plane(origin=(0, 20, 0), x_dir=(1, 0, 0), z_dir=(0, 1, 0)).offset(BOSS_EXTRUDE9_START)):
        with BuildLine():
            ThreePointArc((74.841300691, 386.566045157), (85.866952215, 398.032565376), (101.205117772, 402.25))
            Line((101.205117772, 402.25), (81.601215135, 402.25))
            Line((81.601215135, 402.25), (72.585686906, 382.412203187))
            ThreePointArc((72.585686906, 382.412203187), (73.533720954, 384.316045157), (74.614259042, 386.147934958))
            Line((74.614259042, 386.147934958), (74.841300691, 386.566045157))
        make_face()
        Polygon((103.016755999, 402.25), (129.316768109, 402.25), (129.316768109, 412.25), (86.145836856, 412.25), (81.601215135, 402.25), (101.205117772, 402.25), align=None)
        Polygon((185, 402.25), (200, 402.25), (200, 412.25), (129.316768109, 412.25), (129.316768109, 402.25), align=None)
        with BuildLine():
            Line((200, 387.25), (200, 402.25))
            Line((200, 402.25), (185, 402.25))
            ThreePointArc((185, 402.25), (195.606601718, 397.856601718), (200, 387.25))
        make_face()
    extrude(amount=BOSS_EXTRUDE9_DEPTH)

    # Fillet13
    fillet13_edges = [part.edges().sort_by_distance(p)[0] for p in [
        (86.145836856, 10, -412.25),
    ]]
    fillet(fillet13_edges, radius=FILLET13_R)

    # Fillet14
    fillet14_edges = [part.edges().sort_by_distance(p)[0] for p in [
        (200, 10, -412.25),
    ]]
    fillet(fillet14_edges, radius=FILLET14_R)

    # Sketch21 → Boss-Extrude10 (add, through all)
    with BuildSketch(Plane(origin=(0, 20, 0), x_dir=(1, 0, 0), z_dir=(0, 1, 0))):
        with Locations((125, 324)):
            Circle(SKETCH21_R)
    extrude(amount=-BOSS_EXTRUDE10_DEPTH)


solid = part.part
